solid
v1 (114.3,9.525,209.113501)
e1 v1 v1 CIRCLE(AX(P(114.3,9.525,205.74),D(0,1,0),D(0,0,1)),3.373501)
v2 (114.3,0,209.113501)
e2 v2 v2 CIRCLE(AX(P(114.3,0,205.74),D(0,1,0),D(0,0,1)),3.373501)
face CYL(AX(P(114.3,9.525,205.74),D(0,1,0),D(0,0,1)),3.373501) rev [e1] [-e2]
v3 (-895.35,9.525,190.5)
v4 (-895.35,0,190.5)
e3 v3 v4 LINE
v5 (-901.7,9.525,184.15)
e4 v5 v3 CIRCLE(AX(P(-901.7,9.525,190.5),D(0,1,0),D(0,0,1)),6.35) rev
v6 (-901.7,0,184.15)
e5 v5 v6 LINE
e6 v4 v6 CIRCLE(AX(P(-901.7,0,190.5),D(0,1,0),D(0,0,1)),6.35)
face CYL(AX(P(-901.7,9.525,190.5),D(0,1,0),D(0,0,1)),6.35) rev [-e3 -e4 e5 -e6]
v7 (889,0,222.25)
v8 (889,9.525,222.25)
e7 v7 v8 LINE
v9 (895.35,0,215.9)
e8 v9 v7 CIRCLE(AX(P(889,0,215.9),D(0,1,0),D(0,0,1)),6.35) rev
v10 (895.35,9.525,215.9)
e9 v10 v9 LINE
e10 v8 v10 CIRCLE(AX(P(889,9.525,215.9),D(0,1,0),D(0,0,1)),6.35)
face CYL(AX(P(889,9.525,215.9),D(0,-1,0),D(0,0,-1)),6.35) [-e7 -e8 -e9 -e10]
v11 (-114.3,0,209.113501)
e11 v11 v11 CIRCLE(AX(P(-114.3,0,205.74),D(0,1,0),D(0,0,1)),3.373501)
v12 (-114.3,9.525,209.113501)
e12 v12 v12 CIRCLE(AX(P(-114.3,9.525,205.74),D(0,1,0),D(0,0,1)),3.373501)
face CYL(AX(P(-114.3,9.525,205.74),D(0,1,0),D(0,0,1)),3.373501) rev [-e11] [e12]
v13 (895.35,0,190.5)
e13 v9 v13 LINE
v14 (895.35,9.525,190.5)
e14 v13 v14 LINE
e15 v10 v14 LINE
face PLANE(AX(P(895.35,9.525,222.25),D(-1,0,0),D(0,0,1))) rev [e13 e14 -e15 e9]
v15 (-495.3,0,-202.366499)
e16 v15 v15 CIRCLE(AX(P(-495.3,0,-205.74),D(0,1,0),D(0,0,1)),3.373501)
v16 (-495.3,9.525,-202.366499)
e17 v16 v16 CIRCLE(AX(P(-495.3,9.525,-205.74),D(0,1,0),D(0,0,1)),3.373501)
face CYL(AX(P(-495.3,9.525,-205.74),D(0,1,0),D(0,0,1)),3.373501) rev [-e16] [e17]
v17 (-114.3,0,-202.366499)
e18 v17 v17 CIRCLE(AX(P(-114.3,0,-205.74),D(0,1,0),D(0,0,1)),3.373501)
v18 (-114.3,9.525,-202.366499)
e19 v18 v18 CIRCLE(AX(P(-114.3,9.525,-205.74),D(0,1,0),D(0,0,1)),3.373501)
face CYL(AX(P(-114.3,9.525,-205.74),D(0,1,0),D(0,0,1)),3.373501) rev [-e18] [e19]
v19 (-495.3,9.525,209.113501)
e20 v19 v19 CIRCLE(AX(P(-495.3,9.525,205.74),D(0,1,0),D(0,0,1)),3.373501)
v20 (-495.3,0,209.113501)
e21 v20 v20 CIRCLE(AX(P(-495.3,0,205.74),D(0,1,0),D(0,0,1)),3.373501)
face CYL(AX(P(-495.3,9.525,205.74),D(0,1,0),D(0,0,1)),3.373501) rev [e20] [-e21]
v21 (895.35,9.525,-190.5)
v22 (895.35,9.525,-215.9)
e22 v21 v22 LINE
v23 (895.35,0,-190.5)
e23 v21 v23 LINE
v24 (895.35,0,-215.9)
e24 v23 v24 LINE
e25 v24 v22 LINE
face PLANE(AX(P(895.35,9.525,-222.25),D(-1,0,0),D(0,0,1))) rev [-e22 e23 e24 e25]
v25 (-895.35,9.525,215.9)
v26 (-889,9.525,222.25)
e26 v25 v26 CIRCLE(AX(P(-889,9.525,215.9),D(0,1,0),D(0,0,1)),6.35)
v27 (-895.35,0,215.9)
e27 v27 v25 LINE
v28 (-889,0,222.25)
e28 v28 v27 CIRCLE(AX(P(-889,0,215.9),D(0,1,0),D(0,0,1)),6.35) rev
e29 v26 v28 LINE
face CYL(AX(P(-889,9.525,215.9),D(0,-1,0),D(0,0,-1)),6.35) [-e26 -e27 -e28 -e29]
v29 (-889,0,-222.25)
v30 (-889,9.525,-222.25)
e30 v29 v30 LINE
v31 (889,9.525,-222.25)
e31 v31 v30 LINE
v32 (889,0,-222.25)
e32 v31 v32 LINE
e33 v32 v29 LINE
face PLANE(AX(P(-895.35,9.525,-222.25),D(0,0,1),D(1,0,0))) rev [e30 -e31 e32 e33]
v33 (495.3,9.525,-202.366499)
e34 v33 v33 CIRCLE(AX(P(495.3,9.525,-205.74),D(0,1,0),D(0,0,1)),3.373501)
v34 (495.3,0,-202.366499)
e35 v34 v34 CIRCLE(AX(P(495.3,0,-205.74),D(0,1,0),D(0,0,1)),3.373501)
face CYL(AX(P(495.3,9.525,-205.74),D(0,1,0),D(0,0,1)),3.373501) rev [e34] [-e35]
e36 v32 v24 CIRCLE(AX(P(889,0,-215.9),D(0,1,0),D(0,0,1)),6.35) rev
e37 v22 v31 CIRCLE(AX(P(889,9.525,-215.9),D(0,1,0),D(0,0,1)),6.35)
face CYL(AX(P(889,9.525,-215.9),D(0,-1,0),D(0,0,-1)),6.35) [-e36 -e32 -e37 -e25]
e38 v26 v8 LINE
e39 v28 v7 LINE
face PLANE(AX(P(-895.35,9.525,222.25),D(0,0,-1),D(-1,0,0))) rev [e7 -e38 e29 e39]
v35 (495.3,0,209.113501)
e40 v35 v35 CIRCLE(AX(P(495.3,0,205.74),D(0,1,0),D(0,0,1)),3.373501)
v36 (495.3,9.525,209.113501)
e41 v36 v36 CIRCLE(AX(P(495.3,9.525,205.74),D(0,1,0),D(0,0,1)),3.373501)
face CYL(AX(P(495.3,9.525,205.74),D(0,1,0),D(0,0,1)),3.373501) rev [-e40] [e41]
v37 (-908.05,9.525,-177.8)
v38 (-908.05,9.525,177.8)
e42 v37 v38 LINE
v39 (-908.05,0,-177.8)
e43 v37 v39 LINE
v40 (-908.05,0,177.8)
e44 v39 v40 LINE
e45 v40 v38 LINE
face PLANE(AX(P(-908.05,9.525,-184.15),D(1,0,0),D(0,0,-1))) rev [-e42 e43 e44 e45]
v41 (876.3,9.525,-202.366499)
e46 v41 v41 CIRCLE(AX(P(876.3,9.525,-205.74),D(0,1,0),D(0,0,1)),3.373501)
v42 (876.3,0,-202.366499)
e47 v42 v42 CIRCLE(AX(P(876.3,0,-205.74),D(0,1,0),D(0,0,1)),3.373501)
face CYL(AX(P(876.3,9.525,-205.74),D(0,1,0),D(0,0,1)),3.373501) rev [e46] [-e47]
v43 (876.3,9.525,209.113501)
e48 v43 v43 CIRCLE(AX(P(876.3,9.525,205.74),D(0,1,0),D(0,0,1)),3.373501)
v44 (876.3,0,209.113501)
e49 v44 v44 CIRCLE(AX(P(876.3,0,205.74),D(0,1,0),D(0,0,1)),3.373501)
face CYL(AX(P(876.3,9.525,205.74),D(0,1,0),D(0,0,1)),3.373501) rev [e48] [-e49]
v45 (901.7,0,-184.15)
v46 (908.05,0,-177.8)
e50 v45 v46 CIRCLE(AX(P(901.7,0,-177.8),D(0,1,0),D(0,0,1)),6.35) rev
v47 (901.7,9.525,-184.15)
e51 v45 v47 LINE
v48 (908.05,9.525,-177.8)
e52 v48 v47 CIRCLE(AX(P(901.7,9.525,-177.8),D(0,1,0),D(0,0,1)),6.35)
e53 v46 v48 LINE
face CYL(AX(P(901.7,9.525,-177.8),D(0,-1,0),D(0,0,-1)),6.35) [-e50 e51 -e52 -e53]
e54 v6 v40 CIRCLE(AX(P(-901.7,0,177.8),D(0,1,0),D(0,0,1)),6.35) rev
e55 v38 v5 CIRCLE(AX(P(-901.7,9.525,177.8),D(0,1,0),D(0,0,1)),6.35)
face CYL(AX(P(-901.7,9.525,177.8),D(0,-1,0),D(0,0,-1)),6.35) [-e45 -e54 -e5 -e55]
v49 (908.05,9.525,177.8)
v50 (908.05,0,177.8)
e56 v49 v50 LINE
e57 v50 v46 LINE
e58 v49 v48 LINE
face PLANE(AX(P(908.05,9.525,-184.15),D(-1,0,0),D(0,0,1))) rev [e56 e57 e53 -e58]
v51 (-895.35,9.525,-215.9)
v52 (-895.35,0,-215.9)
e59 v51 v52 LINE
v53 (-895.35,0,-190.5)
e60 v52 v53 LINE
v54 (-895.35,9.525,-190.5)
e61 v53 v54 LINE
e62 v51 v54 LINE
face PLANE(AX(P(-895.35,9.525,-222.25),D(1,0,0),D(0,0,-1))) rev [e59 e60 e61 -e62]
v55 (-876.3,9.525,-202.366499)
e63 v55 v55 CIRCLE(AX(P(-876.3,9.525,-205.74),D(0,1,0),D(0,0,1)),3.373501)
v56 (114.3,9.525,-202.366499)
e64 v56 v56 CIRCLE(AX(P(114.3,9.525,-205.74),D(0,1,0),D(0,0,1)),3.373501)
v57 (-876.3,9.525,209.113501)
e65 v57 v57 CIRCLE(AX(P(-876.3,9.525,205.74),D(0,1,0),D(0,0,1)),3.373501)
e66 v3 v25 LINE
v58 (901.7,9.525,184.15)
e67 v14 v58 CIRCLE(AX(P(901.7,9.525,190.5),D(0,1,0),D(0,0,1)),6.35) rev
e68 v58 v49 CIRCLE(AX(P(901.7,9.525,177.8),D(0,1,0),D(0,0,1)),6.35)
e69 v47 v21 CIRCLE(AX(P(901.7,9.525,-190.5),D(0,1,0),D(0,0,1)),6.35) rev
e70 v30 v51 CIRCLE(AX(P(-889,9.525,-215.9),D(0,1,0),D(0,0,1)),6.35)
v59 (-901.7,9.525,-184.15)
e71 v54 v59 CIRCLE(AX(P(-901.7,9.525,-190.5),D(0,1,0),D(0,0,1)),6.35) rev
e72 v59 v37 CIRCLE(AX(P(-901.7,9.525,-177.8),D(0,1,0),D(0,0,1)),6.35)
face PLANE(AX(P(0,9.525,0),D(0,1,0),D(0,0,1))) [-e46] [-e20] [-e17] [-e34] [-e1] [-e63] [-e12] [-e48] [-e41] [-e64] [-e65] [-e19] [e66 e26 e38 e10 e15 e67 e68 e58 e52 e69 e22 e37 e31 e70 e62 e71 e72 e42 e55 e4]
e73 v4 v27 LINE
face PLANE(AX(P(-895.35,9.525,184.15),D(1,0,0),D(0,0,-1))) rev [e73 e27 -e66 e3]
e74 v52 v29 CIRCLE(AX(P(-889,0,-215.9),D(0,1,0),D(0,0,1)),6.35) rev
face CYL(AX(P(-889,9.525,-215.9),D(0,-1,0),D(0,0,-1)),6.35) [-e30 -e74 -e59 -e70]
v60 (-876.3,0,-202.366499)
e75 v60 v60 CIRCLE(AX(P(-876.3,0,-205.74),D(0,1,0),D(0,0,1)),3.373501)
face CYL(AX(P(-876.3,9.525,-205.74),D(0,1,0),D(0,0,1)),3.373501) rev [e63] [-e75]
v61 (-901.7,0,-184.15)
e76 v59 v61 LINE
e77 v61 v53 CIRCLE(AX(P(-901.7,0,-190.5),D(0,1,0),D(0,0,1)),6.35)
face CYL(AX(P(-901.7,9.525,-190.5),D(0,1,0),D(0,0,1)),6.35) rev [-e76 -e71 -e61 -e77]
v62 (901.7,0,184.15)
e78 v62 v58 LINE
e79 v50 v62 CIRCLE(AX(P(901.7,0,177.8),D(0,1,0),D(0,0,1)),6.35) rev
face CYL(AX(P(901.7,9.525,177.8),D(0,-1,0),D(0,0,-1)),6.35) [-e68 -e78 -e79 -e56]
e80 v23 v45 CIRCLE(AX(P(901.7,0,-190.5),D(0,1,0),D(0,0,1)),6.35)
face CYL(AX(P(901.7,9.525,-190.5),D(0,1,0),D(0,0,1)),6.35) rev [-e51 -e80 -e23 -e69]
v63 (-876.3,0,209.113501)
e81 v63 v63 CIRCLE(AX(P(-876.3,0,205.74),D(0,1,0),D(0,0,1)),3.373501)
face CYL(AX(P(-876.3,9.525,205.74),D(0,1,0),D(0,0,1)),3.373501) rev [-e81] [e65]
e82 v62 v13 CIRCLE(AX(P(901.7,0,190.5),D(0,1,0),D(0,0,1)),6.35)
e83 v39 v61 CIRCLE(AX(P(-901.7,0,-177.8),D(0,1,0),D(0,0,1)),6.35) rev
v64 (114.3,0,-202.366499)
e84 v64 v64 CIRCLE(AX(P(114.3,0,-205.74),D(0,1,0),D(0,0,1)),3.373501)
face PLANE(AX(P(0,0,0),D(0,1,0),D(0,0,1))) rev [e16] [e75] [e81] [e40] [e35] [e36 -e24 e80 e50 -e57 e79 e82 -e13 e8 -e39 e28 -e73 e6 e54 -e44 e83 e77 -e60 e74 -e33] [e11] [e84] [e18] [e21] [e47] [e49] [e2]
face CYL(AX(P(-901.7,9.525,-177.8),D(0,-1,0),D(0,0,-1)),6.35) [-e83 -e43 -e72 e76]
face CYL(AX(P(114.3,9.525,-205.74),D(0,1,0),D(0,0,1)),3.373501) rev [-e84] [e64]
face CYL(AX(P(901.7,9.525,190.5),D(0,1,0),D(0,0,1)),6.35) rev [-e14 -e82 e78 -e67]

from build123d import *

# Parameters (mm, degrees)
BOSS_EXTRUDE1_DEPTH              = 9.525
F_17_64_0_26563_DIAMETER_HOLE1_D = 6.747002
FILLET1_R                        = 6.35


with BuildPart() as part:
    # Sketch1 → Boss-Extrude1 (new body)
    with BuildSketch(Plane(origin=(0, 0, 0), x_dir=(1, 0, 0), z_dir=(0, 1, 0))):
        Polygon((-895.35, 222.25), (-895.35, 184.15), (-908.05, 184.15), (-908.05, -184.15), (-895.35, -184.15), (-895.35, -222.25), (895.35, -222.25), (895.35, -184.15), (908.05, -184.15), (908.05, 184.15), (895.35, 184.15), (895.35, 222.25), align=None)
    extrude(amount=BOSS_EXTRUDE1_DEPTH)

    # 17/64 (0.26563) Diameter Hole1 (through all)
    with Locations(Plane(origin=(0, 9.525, 0), x_dir=(1, 0, 0), z_dir=(0, 1, 0))):
        with Locations((-876.3, -205.74), (-495.3, -205.74), (-876.3, 205.74), (-495.3, 205.74), (-114.3, 205.74), (-114.3, -205.74), (114.3, -205.74), (114.3, 205.74), (495.3, 205.74), (876.3, 205.74), (495.3, -205.74), (876.3, -205.74)):
            Hole(F_17_64_0_26563_DIAMETER_HOLE1_D / 2)

    # Fillet1
    fillet1_edges = [part.edges().sort_by_distance(p)[0] for p in [
        (895.35, 4.7625, 222.25),
        (895.35, 4.7625, 184.15),
        (908.05, 4.7625, 184.15),
        (908.05, 4.7625, -184.15),
        (895.35, 4.7625, -184.15),
        (895.35, 4.7625, -222.25),
        (-908.05, 4.7625, -184.15),
        (-895.35, 4.7625, -184.15),
        (-895.35, 4.7625, -222.25),
        (-895.35, 4.7625, 222.25),
        (-895.35, 4.7625, 184.15),
        (-908.05, 4.7625, 184.15),
    ]]
    fillet(fillet1_edges, radius=FILLET1_R - 0.0001)  # a hair under: the kernel refuses the full size


solid = part.part
